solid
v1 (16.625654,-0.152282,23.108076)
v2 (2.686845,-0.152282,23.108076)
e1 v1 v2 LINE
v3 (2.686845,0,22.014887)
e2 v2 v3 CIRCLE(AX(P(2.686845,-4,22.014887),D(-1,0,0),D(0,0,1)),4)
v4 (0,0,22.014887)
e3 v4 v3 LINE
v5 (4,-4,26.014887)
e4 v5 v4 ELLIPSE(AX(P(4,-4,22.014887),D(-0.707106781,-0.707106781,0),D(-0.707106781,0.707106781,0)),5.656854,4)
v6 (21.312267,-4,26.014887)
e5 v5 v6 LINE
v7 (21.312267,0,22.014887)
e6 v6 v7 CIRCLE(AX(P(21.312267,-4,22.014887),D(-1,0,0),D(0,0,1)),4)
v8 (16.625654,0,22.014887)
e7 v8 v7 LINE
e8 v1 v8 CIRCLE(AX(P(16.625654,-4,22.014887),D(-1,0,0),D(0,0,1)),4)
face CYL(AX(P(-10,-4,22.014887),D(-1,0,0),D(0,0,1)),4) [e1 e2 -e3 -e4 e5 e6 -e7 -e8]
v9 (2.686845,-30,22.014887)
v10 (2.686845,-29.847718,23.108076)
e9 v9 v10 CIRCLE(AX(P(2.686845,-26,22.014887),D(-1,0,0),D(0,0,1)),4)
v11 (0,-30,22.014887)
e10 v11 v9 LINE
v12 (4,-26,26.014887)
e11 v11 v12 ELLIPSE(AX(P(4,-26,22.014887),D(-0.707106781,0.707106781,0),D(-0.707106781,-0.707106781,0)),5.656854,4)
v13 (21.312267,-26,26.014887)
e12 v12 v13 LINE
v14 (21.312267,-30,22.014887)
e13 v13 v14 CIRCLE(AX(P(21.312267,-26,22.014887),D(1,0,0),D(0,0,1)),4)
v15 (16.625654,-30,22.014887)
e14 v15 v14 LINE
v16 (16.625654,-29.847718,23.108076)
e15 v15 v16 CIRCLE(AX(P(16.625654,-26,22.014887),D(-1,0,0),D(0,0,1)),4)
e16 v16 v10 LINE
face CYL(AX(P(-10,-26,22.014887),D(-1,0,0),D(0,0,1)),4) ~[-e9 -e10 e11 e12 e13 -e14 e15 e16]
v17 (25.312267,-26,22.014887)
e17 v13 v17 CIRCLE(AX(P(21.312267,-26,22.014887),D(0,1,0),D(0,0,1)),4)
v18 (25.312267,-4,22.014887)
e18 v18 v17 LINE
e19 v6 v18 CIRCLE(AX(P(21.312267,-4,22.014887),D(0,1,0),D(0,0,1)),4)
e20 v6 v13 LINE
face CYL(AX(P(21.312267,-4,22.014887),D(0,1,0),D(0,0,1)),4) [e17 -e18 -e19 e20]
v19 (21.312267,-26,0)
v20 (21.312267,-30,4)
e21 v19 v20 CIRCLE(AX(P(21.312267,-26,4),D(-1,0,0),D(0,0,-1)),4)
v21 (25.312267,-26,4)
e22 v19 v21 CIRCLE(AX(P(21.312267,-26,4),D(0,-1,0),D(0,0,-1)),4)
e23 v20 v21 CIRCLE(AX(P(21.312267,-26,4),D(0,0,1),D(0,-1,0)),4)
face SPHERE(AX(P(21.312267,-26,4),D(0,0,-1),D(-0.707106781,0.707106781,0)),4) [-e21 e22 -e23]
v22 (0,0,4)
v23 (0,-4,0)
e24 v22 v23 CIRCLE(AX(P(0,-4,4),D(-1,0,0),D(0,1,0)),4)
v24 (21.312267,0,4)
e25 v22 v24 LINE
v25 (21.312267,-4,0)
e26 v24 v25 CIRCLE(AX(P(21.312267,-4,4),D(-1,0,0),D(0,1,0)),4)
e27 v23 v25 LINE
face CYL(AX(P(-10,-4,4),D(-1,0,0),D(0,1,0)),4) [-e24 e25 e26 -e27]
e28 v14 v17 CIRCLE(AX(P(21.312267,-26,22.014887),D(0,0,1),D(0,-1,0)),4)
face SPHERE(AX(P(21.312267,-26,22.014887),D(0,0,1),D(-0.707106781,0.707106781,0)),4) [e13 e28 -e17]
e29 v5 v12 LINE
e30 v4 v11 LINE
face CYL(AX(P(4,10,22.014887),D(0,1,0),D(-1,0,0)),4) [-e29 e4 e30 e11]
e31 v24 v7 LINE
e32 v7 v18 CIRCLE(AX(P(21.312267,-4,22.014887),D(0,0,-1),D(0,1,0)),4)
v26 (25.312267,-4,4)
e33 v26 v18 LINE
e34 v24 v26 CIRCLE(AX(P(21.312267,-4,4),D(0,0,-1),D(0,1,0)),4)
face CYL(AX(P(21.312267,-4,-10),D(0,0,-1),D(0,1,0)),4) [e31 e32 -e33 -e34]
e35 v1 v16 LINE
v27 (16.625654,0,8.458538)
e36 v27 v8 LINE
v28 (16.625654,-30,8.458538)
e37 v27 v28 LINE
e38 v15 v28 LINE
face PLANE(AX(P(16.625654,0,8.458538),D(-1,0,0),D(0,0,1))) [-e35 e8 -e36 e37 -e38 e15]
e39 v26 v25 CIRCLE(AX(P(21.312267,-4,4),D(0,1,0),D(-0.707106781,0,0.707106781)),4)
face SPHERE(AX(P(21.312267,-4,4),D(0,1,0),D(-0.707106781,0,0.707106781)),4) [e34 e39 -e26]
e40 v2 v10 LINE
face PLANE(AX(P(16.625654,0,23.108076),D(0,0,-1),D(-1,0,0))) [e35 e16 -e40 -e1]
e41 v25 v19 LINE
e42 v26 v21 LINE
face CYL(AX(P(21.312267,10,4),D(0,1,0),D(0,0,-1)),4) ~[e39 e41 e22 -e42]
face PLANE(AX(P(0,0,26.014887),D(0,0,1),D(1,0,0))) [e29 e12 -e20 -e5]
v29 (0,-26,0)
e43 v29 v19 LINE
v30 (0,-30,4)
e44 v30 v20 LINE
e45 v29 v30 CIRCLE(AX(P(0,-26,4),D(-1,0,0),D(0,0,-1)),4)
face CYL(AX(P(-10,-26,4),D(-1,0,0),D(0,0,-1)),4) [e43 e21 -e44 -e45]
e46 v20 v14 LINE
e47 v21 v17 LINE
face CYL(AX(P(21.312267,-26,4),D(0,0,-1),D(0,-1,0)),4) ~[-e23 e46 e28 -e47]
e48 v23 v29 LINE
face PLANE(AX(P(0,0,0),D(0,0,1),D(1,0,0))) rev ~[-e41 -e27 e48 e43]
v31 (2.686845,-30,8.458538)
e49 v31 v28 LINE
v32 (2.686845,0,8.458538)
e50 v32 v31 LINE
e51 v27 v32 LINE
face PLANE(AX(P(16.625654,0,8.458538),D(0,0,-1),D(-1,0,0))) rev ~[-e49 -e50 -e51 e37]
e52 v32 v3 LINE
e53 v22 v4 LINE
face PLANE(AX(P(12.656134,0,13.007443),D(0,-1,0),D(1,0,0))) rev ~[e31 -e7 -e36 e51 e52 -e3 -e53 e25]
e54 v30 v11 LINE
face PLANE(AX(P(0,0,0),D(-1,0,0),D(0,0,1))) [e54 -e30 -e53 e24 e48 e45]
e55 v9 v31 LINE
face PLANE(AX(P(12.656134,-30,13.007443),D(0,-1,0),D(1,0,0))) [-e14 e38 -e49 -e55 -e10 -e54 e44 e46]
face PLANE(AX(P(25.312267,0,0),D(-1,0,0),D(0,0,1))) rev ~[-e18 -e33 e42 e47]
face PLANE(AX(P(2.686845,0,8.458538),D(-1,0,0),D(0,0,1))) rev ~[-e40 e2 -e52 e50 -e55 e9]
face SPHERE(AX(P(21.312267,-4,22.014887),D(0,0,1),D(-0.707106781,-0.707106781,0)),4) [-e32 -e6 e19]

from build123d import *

# Parameters (mm, degrees)
F0_W         = 25.3122672439
F0_H         = 26.0148867965
F1_DEPTH     = 30
F2_W         = 13.9388088137
F2_H         = 14.6495383233
F3_DEPTH     = 32
F4_T1_DEPTH  = 18.0148867965
F4_T3_DEPTH  = 31.3122672439
F4_T5_DEPTH  = 36
F4_T7_DEPTH  = 22
F4_T9_DEPTH  = 50
F4_T11_DEPTH = 32.0148867965
F4_S15_W     = 4
F4_S15_H     = 4
F4_T16_DEPTH = 4
F4_S21_W     = 4
F4_S21_H     = 4
F4_T22_DEPTH = 4
F4_S27_W     = 4
F4_S27_H     = 4
F4_T28_DEPTH = 4
F5_T1_DEPTH  = 31.3122672439
F5_S5_W      = 4
F5_S5_H      = 4
F5_T6_DEPTH  = 4


# Not quite as in the source:
# - a fillet or chamfer that OpenCascade refuses, or shapes differently, is made with other operations: its cross-section is extruded or revolved along the edge and cut away or added


with BuildPart() as f1:
    # F0 (on Front) → F1 (new body)
    with BuildSketch(Plane.XZ):
        with Locations((12.6561336219, 13.0074433982)):
            Rectangle(F0_W, F0_H)
    extrude(amount=F1_DEPTH)

    # F2 (on face) → F3 (cut)
    with BuildSketch(Plane(origin=(0, 0, 0), x_dir=(-1, 0, 0), z_dir=(0, 1, 0))):
        with Locations((-9.6562495455, 15.7833071426)):
            Rectangle(F2_W, F2_H)
    extrude(amount=-F3_DEPTH, mode=Mode.SUBTRACT)

    # F4: fillet of radius 4 on 8 edges, made by hand

    # F4_s2 → F4_t1 (cut)
    with BuildSketch(Plane.XY.offset(4)):
        with BuildLine():
            ThreePointArc((21.3122672439, -30), (24.1406943686, -28.8284271247), (25.3122672439, -26))
            Line((25.3122672439, -26), (25.3122672439, -30))
            Line((25.3122672439, -30), (21.3122672439, -30))
        make_face()
    extrude(amount=F4_T1_DEPTH, mode=Mode.SUBTRACT)

    # F4_s4 → F4_t3 (cut)
    with BuildSketch(Plane.YZ.offset(-10)):
        with BuildLine():
            ThreePointArc((-26, 26.0148867965), (-28.8284271247, 24.8433139212), (-30, 22.0148867965))
            Line((-30, 22.0148867965), (-30, 26.0148867965))
            Line((-30, 26.0148867965), (-26, 26.0148867965))
        make_face()
        with BuildLine():
            ThreePointArc((-26, 0), (-28.8284271247, 1.1715728753), (-30, 4))
            Line((-30, 4), (-30, 0))
            Line((-30, 0), (-26, 0))
        make_face()
        with BuildLine():
            ThreePointArc((-4, 26.0148867965), (-1.1715728753, 24.8433139212), (0, 22.0148867965))
            Line((0, 22.0148867965), (0, 26.0148867965))
            Line((0, 26.0148867965), (-4, 26.0148867965))
        make_face()
    extrude(amount=F4_T3_DEPTH, mode=Mode.SUBTRACT)

    # F4_s6 → F4_t5 (cut)
    with BuildSketch(Plane.XZ.offset(-10)):
        with BuildLine():
            ThreePointArc((21.3122672439, 0), (24.1406943686, 1.1715728753), (25.3122672439, 4))
            Line((25.3122672439, 4), (25.3122672439, 0))
            Line((25.3122672439, 0), (21.3122672439, 0))
        make_face()
    extrude(amount=F4_T5_DEPTH, mode=Mode.SUBTRACT)

    # F4_s8 → F4_t7 (cut)
    with BuildSketch(Plane.XZ.offset(4)):
        with BuildLine():
            ThreePointArc((21.3122672439, 26.0148867965), (24.1406943686, 24.8433139212), (25.3122672439, 22.0148867965))
            Line((25.3122672439, 22.0148867965), (25.3122672439, 26.0148867965))
            Line((25.3122672439, 26.0148867965), (21.3122672439, 26.0148867965))
        make_face()
    extrude(amount=F4_T7_DEPTH, mode=Mode.SUBTRACT)

    # F4_s10 → F4_t9 (cut)
    with BuildSketch(Plane.XZ.offset(-10)):
        with BuildLine():
            ThreePointArc((0, 22.0148867965), (1.1715728753, 24.8433139212), (4, 26.0148867965))
            Line((4, 26.0148867965), (0, 26.0148867965))
            Line((0, 26.0148867965), (0, 22.0148867965))
        make_face()
    extrude(amount=F4_T9_DEPTH, mode=Mode.SUBTRACT)

    # F4_s12 → F4_t11 (cut)
    with BuildSketch(Plane.XY.offset(-10)):
        with BuildLine():
            ThreePointArc((21.3122672439, 0), (24.1406943686, -1.1715728753), (25.3122672439, -4))
            Line((25.3122672439, -4), (25.3122672439, 0))
            Line((25.3122672439, 0), (21.3122672439, 0))
        make_face()
    extrude(amount=F4_T11_DEPTH, mode=Mode.SUBTRACT)


with BuildPart() as f4_tool14:
    # F4_s15 → F4_t16 (new body)
    with BuildSketch(Plane.XY.offset(4)):
        with Locations((23.3122672439, -28)):
            Rectangle(F4_S15_W, F4_S15_H)
    extrude(amount=-F4_T16_DEPTH)

    # F4_s17 → F4_t18 (revolve, cut)
    with BuildSketch(Plane(origin=(21.3122672439, -26, 4), x_dir=(-0.7071067812, 0.7071067812, 0), z_dir=(-0.7071067812, -0.7071067812, 0))):
        with BuildLine():
            ThreePointArc((0, -4), (4, 0), (0, 4))
            Line((0, 4), (0, -4))
        make_face()
    revolve(axis=Axis((21.3122672439, -26, 4), (0, 0, -1)), mode=Mode.SUBTRACT)


with BuildPart() as f1_1:
    add(f1.part)

    # F4_t13: cut F4_tool14
    add(f4_tool14.part, mode=Mode.SUBTRACT)


with BuildPart() as f4_tool20:
    # F4_s21 → F4_t22 (new body)
    with BuildSketch(Plane.XY.offset(22.0148867965)):
        with Locations((23.3122672439, -28)):
            Rectangle(F4_S21_W, F4_S21_H)
    extrude(amount=F4_T22_DEPTH)

    # F4_s23 → F4_t24 (revolve, cut)
    with BuildSketch(Plane(origin=(21.3122672439, -26, 22.0148867965), x_dir=(-0.7071067812, 0.7071067812, 0), z_dir=(0.7071067812, 0.7071067812, 0))):
        with BuildLine():
            ThreePointArc((0, -4), (4, 0), (0, 4))
            Line((0, 4), (0, -4))
        make_face()
    revolve(axis=Axis((21.3122672439, -26, 22.0148867965), (0, 0, 1)), mode=Mode.SUBTRACT)


with BuildPart() as f1_2:
    add(f1_1.part)

    # F4_t19: cut F4_tool20
    add(f4_tool20.part, mode=Mode.SUBTRACT)


with BuildPart() as f4_tool26:
    # F4_s27 → F4_t28 (new body)
    with BuildSketch(Plane.XY.offset(22.0148867965)):
        with Locations((23.3122672439, -2)):
            Rectangle(F4_S27_W, F4_S27_H)
    extrude(amount=F4_T28_DEPTH)

    # F4_s29 → F4_t30 (revolve, cut)
    with BuildSketch(Plane(origin=(21.3122672439, -4, 22.0148867965), x_dir=(-0.7071067812, -0.7071067812, 0), z_dir=(-0.7071067812, 0.7071067812, 0))):
        with BuildLine():
            ThreePointArc((0, -4), (4, 0), (0, 4))
            Line((0, 4), (0, -4))
        make_face()
    revolve(axis=Axis((21.3122672439, -4, 22.0148867965), (0, 0, 1)), mode=Mode.SUBTRACT)


with BuildPart() as f1_3:
    add(f1_2.part)

    # F4_t25: cut F4_tool26
    add(f4_tool26.part, mode=Mode.SUBTRACT)

    # F5: fillet of radius 4 on 1 edges, made by hand

    # F5_s2 → F5_t1 (cut)
    with BuildSketch(Plane.YZ.offset(-10)):
        with BuildLine():
            ThreePointArc((0, 4), (-1.1715728753, 1.1715728753), (-4, 0))
            Line((-4, 0), (0, 0))
            Line((0, 0), (0, 4))
        make_face()
    extrude(amount=F5_T1_DEPTH, mode=Mode.SUBTRACT)


with BuildPart() as f5_tool4:
    # F5_s5 → F5_t6 (new body)
    with BuildSketch(Plane.XZ.offset(4)):
        with Locations((23.3122672439, 2)):
            Rectangle(F5_S5_W, F5_S5_H)
    extrude(amount=-F5_T6_DEPTH)

    # F5_s7 → F5_t8 (revolve, cut)
    with BuildSketch(Plane(origin=(21.3122672439, -4, 4), x_dir=(-0.7071067812, 0, 0.7071067812), z_dir=(-0.7071067812, 0, -0.7071067812))):
        with BuildLine():
            ThreePointArc((0, -4), (4, 0), (0, 4))
            Line((0, 4), (0, -4))
        make_face()
    revolve(axis=Axis((21.3122672439, -4, 4), (0, 1, 0)), mode=Mode.SUBTRACT)


with BuildPart() as f1_4:
    add(f1_3.part)

    # F5_t3: cut F5_tool4
    add(f5_tool4.part, mode=Mode.SUBTRACT)


solid = f1_4.part
